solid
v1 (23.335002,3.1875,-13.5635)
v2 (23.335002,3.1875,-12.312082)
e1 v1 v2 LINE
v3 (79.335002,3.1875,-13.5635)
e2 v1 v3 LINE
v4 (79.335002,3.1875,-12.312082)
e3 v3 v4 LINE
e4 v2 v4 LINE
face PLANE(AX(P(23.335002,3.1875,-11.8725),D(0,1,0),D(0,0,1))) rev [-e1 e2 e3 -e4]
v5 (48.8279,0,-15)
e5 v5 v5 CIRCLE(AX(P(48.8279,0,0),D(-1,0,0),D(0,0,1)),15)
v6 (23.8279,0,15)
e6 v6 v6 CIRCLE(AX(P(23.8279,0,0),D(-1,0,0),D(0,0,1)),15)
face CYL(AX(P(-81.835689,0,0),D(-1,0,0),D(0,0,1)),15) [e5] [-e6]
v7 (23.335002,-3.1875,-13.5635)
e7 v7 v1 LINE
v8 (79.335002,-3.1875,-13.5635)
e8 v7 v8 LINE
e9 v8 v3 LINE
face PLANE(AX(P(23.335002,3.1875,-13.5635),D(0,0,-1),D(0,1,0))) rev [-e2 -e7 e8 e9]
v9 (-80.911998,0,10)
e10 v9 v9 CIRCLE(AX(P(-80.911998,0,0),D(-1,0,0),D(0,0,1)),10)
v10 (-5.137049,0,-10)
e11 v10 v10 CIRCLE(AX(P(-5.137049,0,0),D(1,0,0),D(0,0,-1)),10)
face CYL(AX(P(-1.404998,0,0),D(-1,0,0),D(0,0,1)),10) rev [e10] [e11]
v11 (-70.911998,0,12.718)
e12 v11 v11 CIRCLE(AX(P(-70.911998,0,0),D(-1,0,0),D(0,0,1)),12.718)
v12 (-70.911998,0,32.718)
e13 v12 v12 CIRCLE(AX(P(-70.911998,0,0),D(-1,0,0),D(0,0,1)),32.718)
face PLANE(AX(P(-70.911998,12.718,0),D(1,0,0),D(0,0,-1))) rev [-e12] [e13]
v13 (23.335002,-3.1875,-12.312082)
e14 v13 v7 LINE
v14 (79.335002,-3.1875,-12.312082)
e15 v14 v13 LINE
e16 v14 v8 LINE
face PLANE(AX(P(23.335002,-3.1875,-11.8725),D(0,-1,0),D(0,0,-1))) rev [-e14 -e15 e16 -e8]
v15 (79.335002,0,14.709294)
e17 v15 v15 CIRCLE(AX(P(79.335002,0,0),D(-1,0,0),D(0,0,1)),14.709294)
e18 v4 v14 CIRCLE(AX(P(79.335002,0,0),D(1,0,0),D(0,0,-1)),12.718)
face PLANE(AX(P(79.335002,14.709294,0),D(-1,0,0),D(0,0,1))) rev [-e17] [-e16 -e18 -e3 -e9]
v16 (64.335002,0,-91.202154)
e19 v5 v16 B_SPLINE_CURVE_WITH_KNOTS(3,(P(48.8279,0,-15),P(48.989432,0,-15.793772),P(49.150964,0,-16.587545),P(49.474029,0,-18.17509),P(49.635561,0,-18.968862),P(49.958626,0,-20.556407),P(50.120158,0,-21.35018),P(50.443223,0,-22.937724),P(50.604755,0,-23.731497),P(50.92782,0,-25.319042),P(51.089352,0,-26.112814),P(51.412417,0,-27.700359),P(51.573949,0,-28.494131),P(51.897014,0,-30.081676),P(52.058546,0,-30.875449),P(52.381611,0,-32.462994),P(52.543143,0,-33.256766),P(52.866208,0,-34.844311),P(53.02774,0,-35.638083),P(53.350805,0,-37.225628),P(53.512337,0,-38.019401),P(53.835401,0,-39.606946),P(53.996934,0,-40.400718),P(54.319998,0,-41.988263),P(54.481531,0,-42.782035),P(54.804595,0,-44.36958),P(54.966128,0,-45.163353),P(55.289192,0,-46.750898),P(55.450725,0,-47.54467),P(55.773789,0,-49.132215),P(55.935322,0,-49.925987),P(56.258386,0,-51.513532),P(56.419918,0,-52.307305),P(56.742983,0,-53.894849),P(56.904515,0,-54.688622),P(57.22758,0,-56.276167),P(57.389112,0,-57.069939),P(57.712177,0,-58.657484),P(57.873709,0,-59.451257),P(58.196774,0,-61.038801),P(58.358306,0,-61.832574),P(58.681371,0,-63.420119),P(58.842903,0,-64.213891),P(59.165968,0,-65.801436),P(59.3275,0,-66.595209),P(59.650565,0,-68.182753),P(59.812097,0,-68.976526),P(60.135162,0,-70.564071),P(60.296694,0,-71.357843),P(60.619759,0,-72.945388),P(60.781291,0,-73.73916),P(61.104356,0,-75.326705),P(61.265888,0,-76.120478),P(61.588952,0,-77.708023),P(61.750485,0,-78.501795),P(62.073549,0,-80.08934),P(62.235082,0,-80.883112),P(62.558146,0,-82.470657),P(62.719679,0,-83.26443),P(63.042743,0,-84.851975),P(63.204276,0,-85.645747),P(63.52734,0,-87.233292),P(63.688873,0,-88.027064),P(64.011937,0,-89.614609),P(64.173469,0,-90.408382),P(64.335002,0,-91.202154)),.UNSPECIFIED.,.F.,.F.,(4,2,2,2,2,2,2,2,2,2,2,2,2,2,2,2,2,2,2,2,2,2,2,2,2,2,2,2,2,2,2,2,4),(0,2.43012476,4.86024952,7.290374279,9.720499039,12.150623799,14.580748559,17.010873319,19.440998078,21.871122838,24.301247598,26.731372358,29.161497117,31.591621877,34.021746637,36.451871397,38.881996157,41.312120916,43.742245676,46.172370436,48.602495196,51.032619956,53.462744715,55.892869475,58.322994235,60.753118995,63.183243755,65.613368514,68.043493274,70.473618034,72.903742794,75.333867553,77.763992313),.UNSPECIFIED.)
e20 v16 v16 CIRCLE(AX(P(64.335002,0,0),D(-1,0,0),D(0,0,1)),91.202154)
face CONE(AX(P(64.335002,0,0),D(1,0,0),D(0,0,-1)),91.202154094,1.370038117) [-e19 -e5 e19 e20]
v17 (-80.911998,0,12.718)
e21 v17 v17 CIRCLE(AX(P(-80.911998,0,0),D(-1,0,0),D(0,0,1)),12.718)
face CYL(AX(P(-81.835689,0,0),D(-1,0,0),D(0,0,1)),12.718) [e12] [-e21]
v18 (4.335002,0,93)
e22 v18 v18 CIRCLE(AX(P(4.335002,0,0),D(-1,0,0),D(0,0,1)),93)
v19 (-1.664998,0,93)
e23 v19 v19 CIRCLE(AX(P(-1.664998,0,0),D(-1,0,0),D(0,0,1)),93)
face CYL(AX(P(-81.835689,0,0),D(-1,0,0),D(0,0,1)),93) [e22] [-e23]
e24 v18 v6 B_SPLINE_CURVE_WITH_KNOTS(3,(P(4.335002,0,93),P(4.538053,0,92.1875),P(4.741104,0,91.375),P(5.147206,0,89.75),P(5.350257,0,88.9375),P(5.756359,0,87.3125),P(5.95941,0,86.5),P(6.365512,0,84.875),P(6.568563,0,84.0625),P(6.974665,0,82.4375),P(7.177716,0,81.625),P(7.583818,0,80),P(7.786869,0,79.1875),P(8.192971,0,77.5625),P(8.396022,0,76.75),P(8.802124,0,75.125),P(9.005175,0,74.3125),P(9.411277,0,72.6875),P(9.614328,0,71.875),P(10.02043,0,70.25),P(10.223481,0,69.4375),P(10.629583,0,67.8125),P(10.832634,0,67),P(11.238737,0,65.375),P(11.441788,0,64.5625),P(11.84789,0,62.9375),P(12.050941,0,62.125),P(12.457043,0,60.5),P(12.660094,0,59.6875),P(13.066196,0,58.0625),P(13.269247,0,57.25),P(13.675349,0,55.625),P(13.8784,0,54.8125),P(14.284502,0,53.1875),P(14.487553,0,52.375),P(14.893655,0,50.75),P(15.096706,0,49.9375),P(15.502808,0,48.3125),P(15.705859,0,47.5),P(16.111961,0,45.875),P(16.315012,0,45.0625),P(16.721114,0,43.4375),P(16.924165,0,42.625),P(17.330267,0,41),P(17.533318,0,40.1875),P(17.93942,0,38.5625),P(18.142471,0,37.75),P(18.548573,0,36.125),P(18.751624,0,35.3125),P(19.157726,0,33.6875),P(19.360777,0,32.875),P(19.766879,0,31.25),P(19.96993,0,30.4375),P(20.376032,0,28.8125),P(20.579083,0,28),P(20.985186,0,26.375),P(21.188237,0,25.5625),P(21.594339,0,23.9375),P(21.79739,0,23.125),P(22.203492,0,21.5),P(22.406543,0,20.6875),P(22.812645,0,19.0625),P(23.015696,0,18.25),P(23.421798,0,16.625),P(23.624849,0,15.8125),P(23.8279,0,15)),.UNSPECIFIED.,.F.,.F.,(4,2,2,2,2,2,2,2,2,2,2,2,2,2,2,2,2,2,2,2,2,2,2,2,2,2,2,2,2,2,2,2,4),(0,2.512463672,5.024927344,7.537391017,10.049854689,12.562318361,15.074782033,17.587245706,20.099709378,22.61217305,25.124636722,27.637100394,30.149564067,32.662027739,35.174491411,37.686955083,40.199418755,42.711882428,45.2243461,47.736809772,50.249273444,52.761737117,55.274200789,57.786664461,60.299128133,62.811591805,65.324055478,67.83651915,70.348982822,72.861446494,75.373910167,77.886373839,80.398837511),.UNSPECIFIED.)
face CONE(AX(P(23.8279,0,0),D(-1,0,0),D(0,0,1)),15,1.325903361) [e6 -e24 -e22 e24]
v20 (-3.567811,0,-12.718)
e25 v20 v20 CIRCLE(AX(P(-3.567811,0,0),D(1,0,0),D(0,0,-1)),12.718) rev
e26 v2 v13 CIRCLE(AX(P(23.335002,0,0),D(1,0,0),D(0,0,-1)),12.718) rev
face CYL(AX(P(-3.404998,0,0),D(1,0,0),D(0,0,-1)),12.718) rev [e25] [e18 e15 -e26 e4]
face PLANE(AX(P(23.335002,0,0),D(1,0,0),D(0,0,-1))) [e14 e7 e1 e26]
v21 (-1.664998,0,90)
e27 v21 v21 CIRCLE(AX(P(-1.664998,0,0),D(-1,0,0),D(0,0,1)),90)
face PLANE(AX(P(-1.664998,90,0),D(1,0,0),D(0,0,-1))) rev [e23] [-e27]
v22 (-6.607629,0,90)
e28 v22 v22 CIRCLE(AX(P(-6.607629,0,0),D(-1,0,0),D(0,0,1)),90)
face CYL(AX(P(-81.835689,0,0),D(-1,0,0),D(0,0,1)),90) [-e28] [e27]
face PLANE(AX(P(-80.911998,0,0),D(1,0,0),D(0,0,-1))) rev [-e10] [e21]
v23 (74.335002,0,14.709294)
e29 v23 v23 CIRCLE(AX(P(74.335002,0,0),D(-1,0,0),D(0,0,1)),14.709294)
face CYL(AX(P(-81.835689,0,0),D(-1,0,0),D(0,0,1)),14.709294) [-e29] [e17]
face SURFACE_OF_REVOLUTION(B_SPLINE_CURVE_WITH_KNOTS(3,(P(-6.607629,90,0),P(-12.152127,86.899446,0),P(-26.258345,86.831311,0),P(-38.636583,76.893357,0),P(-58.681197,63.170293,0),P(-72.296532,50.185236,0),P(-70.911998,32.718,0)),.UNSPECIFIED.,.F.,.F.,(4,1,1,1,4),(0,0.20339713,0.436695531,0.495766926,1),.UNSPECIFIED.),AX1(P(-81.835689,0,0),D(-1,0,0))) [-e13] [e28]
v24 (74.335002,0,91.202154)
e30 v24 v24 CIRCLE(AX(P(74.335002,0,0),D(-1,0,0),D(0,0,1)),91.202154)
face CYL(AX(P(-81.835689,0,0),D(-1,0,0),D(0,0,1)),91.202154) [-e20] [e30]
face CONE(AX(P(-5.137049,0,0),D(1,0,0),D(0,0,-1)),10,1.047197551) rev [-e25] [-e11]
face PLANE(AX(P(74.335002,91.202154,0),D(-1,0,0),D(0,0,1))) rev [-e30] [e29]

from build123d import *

# Parameters (mm, degrees)
SKETCH2_R          = 12.718
CUT_EXTRUDE1_DEPTH = 82.74
SKETCH3_R          = 10
CUT_EXTRUDE2_DEPTH = 79.507
SKETCH4_W          = 1.691
SKETCH4_H          = 6.375
CUT_EXTRUDE3_DEPTH = 56


with BuildPart() as part:
    # Sketch1 → Revolve1 (revolve)
    with BuildSketch(Plane.XY, mode=Mode.PRIVATE) as revolve1_sk:
        with BuildLine():
            Line((-80.911998208, 0), (-80.911998208, 12.718))
            Line((-80.911998208, 12.718), (-70.911998208, 12.718))
            Line((-70.911998208, 12.718), (-70.911998208, 32.718))
            add(Edge.make_bspline(
                [(-70.911998208, 32.718), (-72.296532146, 50.185235542), (-58.681197048, 63.170292577), (-38.636582778, 76.893357171), (-26.258344783, 86.831311493), (-12.152126662, 86.899446164), (-6.607628807, 90)],
                knots=[0, 0, 0, 0, 0.504233074, 0.563304469, 0.79660287, 1, 1, 1, 1], degree=3))
            Line((-6.607628807, 90), (-1.664998208, 90))
            Line((-1.664998208, 90), (-1.664998208, 93))
            Line((-1.664998208, 93), (4.335001792, 93))
            Line((4.335001792, 93), (23.827899809, 15))
            Line((23.827899809, 15), (48.827899809, 15))
            Line((48.827899809, 15), (64.335001792, 91.202154094))
            Line((64.335001792, 91.202154094), (74.335001792, 91.202154094))
            Line((74.335001792, 91.202154094), (74.335001792, 14.709294291))
            Line((74.335001792, 14.709294291), (79.335001792, 14.709294291))
            Line((79.335001792, 14.709294291), (79.335001792, 0))
            Line((79.335001792, 0), (-80.911998208, 0))
        make_face()
    revolve(revolve1_sk.sketch.rotate(Axis((-81.835688806, 0, 0), (1, 0, 0)), 90), axis=Axis((-81.835688806, 0, 0), (1, 0, 0)))

    # Sketch2 → Cut-Extrude1 (cut)
    with BuildSketch(Plane(origin=(79.335001792, 0, 0), x_dir=(0, 0, -1), z_dir=(1, 0, 0))):
        with Locations(Location((0, 0, 0), (0, 0, 180))):
            Circle(SKETCH2_R)
    extrude(amount=-CUT_EXTRUDE1_DEPTH, mode=Mode.SUBTRACT)

    # Sketch3 → Cut-Extrude2 (cut)
    with BuildSketch(Plane.ZY.offset(80.911998208)):
        Circle(SKETCH3_R)
    extrude(amount=-CUT_EXTRUDE2_DEPTH, mode=Mode.SUBTRACT)

    # Chamfer1
    # the kernel refuses this chamfer: 3, 1.732050808 mm, written as the material it takes off along each edge
    with BuildSketch(Plane(origin=(-3.404998208, 0, 0), x_dir=(0, 0, 1), z_dir=(0, -1, 0))) as chamfer1_piece_1_section:
        with BuildLine():
            Line((9.896076952, 1.792050808), (13.103923048, -0.06))
            Line((13.103923048, -0.06), (13.103923048, -0.12))
            ThreePointArc((13.103923048, -0.12), (11.551961524, -0.06), (10, -0.06))
            Line((10, -0.06), (9.94, 0))
            ThreePointArc((9.94, 0), (9.94, 0.896025404), (9.836076952, 1.792050808))
            Line((9.836076952, 1.792050808), (9.896076952, 1.792050808))
        make_face()
    chamfer1_piece_1 = revolve(axis=Axis((-3.404998208, 0, 0), (-1, 0, 0)), mode=Mode.PRIVATE)
    chamfer1_piece_1 = chamfer1_piece_1 & Plane(origin=(-4.331873762, 0, 0), x_dir=(0, 0, 1), z_dir=(1, 0, 0)) * Cylinder(12.718, 53, mode=Mode.PRIVATE)
    add(chamfer1_piece_1, mode=Mode.SUBTRACT)

    # Sketch4 → Cut-Extrude3 (cut)
    with BuildSketch(Plane(origin=(79.335001792, 0, 0), x_dir=(0, 0, -1), z_dir=(1, 0, 0))):
        with Locations((12.718, 0)):
            Rectangle(SKETCH4_W, SKETCH4_H)
    extrude(amount=-CUT_EXTRUDE3_DEPTH, mode=Mode.SUBTRACT)


solid = part.part
